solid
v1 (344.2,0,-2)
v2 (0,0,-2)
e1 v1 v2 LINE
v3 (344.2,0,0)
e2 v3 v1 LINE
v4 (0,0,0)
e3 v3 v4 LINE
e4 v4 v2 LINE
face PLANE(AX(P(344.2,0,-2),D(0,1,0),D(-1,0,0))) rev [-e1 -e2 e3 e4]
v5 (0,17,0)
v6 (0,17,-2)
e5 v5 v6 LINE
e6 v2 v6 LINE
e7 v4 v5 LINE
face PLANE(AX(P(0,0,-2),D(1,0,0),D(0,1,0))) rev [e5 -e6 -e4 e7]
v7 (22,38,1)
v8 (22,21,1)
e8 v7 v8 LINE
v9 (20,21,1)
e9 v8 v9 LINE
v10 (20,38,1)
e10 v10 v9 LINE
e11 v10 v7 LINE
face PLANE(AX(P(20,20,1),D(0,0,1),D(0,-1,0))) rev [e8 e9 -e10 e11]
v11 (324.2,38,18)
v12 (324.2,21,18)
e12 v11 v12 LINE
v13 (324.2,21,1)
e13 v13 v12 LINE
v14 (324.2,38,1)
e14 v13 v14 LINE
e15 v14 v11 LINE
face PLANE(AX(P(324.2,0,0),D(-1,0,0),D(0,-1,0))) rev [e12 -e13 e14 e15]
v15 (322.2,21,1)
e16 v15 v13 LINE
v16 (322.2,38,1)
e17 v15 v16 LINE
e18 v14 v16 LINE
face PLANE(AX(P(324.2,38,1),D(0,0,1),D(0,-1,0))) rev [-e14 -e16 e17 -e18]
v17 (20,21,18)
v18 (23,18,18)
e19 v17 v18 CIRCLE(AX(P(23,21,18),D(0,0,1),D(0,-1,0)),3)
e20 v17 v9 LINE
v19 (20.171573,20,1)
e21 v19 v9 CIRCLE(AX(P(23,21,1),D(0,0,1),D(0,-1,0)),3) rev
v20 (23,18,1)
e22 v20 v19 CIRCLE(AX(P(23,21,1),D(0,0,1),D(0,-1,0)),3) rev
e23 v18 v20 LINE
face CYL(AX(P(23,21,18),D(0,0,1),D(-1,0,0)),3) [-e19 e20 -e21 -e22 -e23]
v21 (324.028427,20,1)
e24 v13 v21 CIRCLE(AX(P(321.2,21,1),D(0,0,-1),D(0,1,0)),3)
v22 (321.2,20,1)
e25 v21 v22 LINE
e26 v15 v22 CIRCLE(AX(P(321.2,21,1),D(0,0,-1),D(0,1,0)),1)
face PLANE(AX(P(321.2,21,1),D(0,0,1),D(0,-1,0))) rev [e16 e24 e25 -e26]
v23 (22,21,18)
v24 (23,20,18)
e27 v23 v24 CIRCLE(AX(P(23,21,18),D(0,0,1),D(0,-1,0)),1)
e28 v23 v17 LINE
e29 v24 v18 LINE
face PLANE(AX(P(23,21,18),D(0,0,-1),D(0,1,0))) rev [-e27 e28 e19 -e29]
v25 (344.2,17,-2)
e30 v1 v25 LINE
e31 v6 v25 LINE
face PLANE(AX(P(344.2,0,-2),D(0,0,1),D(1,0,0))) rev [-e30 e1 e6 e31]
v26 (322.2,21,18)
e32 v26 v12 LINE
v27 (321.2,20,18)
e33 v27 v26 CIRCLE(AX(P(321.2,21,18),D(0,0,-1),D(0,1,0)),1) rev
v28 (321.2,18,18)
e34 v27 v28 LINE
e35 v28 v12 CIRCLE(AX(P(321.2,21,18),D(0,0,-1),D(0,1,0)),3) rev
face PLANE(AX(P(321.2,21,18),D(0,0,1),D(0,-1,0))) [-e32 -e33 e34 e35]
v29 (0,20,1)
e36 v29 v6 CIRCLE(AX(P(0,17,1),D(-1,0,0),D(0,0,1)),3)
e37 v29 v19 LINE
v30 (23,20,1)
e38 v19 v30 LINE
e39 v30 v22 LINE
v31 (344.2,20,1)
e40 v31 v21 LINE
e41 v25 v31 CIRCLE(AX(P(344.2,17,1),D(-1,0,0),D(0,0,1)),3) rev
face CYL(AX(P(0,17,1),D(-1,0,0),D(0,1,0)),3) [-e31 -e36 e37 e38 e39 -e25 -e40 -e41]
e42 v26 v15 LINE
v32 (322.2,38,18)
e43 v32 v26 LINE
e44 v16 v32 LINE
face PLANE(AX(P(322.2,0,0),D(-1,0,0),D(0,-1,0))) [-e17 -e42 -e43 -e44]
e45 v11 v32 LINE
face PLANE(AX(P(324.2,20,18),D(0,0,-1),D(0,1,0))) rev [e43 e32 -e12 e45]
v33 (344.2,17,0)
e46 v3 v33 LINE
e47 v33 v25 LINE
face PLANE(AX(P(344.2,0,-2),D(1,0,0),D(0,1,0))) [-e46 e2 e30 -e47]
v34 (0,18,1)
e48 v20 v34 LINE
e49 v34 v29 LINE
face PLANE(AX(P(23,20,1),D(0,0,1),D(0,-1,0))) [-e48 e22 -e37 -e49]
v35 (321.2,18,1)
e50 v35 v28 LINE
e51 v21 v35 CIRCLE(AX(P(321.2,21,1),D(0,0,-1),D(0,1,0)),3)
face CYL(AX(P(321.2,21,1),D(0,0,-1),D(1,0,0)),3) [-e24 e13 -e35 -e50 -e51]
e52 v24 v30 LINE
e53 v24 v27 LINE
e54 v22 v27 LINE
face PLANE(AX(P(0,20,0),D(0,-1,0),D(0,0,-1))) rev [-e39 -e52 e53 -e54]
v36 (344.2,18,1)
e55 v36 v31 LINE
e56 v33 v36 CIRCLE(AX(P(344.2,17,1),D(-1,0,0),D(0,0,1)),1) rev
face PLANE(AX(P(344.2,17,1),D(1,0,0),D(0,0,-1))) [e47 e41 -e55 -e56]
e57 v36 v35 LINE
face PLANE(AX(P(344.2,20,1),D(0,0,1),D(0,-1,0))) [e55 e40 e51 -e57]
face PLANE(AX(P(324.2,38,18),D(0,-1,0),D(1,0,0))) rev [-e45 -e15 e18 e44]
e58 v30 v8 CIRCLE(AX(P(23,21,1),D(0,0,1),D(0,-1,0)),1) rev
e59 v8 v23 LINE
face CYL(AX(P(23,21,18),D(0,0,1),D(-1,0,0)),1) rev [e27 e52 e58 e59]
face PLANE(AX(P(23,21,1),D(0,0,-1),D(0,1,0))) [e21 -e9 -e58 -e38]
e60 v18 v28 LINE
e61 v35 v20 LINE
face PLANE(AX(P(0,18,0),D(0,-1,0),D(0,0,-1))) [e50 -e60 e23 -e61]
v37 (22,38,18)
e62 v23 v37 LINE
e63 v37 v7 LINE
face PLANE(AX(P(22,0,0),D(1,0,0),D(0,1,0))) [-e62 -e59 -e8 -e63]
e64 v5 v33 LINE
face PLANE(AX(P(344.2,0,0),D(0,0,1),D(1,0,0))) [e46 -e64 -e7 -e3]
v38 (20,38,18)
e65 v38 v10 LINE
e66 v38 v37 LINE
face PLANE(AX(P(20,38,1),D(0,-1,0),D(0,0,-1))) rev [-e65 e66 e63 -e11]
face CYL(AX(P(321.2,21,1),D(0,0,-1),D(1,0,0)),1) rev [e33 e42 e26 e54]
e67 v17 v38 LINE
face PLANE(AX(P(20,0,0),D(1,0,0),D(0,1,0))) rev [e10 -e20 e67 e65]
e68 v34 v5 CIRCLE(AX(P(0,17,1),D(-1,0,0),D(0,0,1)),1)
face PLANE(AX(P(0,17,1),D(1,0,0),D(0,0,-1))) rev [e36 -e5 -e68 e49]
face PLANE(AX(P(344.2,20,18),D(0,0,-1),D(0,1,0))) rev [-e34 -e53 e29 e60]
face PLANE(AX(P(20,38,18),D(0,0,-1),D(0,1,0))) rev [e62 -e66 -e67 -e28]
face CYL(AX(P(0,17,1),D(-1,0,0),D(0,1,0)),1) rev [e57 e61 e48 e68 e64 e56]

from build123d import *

# Parameters (mm, degrees)
SKETCH_1_W                       = 2
SKETCH_1_H                       = 20
EXTRUDE_1_DEPTH                  = 344.2
SM_EDGE_FLANGE_1_STRIP_W         = 10
SM_EDGE_FLANGE_1_STRIP_H         = 2
SM_EDGE_FLANGE_1_STRIP_CUT_DEPTH = 344.2
SM_EDGE_FLANGE_1_DEPTH           = 344.2
SM_EDGE_FLANGE_2_STRIP_W         = 30
SM_EDGE_FLANGE_2_STRIP_H         = 2
SM_EDGE_FLANGE_2_STRIP_CUT_DEPTH = 17
SM_EDGE_FLANGE_2_DEPTH           = 17
SM_EDGE_FLANGE_3_STRIP_W         = 30
SM_EDGE_FLANGE_3_STRIP_H         = 2
SM_EDGE_FLANGE_3_STRIP_CUT_DEPTH = 17
SM_EDGE_FLANGE_3_DEPTH           = 17


# Sheet-metal steps are written as plain solids
with BuildPart() as part:
    # Sketch 1 → Бобышка-Вытянуть1 (new body)
    with BuildSketch(Plane(origin=(0, 0, 0), x_dir=(0, 0, -1), z_dir=(1, 0, 0))):
        with Locations((1, 10)):
            Rectangle(SKETCH_1_W, SKETCH_1_H)
    extrude(amount=EXTRUDE_1_DEPTH)

    # Ребро-кромка1 strip (across the edge) → Ребро-кромка1 strip cut (cut)
    with BuildSketch(Plane(origin=(344.2, 20, 0), x_dir=(0, -1, 0), z_dir=(-1, 0, 0))):
        with Locations((-2, -1)):
            Rectangle(SM_EDGE_FLANGE_1_STRIP_W, SM_EDGE_FLANGE_1_STRIP_H)
    extrude(amount=SM_EDGE_FLANGE_1_STRIP_CUT_DEPTH, mode=Mode.SUBTRACT)

    # Ребро-кромка1 section (across the edge) → Ребро-кромка1 (add)
    with BuildSketch(Plane(origin=(344.2, 20, 0), x_dir=(0, -1, 0), z_dir=(-1, 0, 0))):
        with BuildLine():
            Line((0, 1), (0, 18))
            Line((0, 18), (2, 18))
            Line((2, 18), (2, 1))
            ThreePointArc((2, 1), (2.292893219, 0.292893219), (3, 0))
            Line((3, 0), (3, -2))
            ThreePointArc((3, -2), (0.878679656, -1.121320344), (0, 1))
        make_face()
    extrude(amount=SM_EDGE_FLANGE_1_DEPTH)

    # Ребро-кромка2 strip (across the edge) → Ребро-кромка2 strip cut (cut)
    with BuildSketch(Plane(origin=(20, 20, 1), x_dir=(1, 0, 0), z_dir=(0, 0, 1))):
        with Locations((-12, -1)):
            Rectangle(SM_EDGE_FLANGE_2_STRIP_W, SM_EDGE_FLANGE_2_STRIP_H)
    extrude(amount=SM_EDGE_FLANGE_2_STRIP_CUT_DEPTH, mode=Mode.SUBTRACT)

    # Ребро-кромка2 section (across the edge) → Ребро-кромка2 (add)
    with BuildSketch(Plane(origin=(20, 20, 1), x_dir=(1, 0, 0), z_dir=(0, 0, 1))):
        with BuildLine():
            Line((0, 1), (0, 18))
            Line((0, 18), (2, 18))
            Line((2, 18), (2, 1))
            ThreePointArc((2, 1), (2.292893219, 0.292893219), (3, 0))
            Line((3, 0), (3, -2))
            ThreePointArc((3, -2), (0.878679656, -1.121320344), (0, 1))
        make_face()
    extrude(amount=SM_EDGE_FLANGE_2_DEPTH)

    # Ребро-кромка3 strip (across the edge) → Ребро-кромка3 strip cut (cut)
    with BuildSketch(Plane(origin=(324.2, 20, 18), x_dir=(-1, 0, 0), z_dir=(0, 0, -1))):
        with Locations((-12, -1)):
            Rectangle(SM_EDGE_FLANGE_3_STRIP_W, SM_EDGE_FLANGE_3_STRIP_H)
    extrude(amount=SM_EDGE_FLANGE_3_STRIP_CUT_DEPTH, mode=Mode.SUBTRACT)

    # Ребро-кромка3 section (across the edge) → Ребро-кромка3 (add)
    with BuildSketch(Plane(origin=(324.2, 20, 18), x_dir=(-1, 0, 0), z_dir=(0, 0, -1))):
        with BuildLine():
            Line((0, 1), (0, 18))
            Line((0, 18), (2, 18))
            Line((2, 18), (2, 1))
            ThreePointArc((2, 1), (2.292893219, 0.292893219), (3, 0))
            Line((3, 0), (3, -2))
            ThreePointArc((3, -2), (0.878679656, -1.121320344), (0, 1))
        make_face()
    extrude(amount=SM_EDGE_FLANGE_3_DEPTH)


solid = part.part
